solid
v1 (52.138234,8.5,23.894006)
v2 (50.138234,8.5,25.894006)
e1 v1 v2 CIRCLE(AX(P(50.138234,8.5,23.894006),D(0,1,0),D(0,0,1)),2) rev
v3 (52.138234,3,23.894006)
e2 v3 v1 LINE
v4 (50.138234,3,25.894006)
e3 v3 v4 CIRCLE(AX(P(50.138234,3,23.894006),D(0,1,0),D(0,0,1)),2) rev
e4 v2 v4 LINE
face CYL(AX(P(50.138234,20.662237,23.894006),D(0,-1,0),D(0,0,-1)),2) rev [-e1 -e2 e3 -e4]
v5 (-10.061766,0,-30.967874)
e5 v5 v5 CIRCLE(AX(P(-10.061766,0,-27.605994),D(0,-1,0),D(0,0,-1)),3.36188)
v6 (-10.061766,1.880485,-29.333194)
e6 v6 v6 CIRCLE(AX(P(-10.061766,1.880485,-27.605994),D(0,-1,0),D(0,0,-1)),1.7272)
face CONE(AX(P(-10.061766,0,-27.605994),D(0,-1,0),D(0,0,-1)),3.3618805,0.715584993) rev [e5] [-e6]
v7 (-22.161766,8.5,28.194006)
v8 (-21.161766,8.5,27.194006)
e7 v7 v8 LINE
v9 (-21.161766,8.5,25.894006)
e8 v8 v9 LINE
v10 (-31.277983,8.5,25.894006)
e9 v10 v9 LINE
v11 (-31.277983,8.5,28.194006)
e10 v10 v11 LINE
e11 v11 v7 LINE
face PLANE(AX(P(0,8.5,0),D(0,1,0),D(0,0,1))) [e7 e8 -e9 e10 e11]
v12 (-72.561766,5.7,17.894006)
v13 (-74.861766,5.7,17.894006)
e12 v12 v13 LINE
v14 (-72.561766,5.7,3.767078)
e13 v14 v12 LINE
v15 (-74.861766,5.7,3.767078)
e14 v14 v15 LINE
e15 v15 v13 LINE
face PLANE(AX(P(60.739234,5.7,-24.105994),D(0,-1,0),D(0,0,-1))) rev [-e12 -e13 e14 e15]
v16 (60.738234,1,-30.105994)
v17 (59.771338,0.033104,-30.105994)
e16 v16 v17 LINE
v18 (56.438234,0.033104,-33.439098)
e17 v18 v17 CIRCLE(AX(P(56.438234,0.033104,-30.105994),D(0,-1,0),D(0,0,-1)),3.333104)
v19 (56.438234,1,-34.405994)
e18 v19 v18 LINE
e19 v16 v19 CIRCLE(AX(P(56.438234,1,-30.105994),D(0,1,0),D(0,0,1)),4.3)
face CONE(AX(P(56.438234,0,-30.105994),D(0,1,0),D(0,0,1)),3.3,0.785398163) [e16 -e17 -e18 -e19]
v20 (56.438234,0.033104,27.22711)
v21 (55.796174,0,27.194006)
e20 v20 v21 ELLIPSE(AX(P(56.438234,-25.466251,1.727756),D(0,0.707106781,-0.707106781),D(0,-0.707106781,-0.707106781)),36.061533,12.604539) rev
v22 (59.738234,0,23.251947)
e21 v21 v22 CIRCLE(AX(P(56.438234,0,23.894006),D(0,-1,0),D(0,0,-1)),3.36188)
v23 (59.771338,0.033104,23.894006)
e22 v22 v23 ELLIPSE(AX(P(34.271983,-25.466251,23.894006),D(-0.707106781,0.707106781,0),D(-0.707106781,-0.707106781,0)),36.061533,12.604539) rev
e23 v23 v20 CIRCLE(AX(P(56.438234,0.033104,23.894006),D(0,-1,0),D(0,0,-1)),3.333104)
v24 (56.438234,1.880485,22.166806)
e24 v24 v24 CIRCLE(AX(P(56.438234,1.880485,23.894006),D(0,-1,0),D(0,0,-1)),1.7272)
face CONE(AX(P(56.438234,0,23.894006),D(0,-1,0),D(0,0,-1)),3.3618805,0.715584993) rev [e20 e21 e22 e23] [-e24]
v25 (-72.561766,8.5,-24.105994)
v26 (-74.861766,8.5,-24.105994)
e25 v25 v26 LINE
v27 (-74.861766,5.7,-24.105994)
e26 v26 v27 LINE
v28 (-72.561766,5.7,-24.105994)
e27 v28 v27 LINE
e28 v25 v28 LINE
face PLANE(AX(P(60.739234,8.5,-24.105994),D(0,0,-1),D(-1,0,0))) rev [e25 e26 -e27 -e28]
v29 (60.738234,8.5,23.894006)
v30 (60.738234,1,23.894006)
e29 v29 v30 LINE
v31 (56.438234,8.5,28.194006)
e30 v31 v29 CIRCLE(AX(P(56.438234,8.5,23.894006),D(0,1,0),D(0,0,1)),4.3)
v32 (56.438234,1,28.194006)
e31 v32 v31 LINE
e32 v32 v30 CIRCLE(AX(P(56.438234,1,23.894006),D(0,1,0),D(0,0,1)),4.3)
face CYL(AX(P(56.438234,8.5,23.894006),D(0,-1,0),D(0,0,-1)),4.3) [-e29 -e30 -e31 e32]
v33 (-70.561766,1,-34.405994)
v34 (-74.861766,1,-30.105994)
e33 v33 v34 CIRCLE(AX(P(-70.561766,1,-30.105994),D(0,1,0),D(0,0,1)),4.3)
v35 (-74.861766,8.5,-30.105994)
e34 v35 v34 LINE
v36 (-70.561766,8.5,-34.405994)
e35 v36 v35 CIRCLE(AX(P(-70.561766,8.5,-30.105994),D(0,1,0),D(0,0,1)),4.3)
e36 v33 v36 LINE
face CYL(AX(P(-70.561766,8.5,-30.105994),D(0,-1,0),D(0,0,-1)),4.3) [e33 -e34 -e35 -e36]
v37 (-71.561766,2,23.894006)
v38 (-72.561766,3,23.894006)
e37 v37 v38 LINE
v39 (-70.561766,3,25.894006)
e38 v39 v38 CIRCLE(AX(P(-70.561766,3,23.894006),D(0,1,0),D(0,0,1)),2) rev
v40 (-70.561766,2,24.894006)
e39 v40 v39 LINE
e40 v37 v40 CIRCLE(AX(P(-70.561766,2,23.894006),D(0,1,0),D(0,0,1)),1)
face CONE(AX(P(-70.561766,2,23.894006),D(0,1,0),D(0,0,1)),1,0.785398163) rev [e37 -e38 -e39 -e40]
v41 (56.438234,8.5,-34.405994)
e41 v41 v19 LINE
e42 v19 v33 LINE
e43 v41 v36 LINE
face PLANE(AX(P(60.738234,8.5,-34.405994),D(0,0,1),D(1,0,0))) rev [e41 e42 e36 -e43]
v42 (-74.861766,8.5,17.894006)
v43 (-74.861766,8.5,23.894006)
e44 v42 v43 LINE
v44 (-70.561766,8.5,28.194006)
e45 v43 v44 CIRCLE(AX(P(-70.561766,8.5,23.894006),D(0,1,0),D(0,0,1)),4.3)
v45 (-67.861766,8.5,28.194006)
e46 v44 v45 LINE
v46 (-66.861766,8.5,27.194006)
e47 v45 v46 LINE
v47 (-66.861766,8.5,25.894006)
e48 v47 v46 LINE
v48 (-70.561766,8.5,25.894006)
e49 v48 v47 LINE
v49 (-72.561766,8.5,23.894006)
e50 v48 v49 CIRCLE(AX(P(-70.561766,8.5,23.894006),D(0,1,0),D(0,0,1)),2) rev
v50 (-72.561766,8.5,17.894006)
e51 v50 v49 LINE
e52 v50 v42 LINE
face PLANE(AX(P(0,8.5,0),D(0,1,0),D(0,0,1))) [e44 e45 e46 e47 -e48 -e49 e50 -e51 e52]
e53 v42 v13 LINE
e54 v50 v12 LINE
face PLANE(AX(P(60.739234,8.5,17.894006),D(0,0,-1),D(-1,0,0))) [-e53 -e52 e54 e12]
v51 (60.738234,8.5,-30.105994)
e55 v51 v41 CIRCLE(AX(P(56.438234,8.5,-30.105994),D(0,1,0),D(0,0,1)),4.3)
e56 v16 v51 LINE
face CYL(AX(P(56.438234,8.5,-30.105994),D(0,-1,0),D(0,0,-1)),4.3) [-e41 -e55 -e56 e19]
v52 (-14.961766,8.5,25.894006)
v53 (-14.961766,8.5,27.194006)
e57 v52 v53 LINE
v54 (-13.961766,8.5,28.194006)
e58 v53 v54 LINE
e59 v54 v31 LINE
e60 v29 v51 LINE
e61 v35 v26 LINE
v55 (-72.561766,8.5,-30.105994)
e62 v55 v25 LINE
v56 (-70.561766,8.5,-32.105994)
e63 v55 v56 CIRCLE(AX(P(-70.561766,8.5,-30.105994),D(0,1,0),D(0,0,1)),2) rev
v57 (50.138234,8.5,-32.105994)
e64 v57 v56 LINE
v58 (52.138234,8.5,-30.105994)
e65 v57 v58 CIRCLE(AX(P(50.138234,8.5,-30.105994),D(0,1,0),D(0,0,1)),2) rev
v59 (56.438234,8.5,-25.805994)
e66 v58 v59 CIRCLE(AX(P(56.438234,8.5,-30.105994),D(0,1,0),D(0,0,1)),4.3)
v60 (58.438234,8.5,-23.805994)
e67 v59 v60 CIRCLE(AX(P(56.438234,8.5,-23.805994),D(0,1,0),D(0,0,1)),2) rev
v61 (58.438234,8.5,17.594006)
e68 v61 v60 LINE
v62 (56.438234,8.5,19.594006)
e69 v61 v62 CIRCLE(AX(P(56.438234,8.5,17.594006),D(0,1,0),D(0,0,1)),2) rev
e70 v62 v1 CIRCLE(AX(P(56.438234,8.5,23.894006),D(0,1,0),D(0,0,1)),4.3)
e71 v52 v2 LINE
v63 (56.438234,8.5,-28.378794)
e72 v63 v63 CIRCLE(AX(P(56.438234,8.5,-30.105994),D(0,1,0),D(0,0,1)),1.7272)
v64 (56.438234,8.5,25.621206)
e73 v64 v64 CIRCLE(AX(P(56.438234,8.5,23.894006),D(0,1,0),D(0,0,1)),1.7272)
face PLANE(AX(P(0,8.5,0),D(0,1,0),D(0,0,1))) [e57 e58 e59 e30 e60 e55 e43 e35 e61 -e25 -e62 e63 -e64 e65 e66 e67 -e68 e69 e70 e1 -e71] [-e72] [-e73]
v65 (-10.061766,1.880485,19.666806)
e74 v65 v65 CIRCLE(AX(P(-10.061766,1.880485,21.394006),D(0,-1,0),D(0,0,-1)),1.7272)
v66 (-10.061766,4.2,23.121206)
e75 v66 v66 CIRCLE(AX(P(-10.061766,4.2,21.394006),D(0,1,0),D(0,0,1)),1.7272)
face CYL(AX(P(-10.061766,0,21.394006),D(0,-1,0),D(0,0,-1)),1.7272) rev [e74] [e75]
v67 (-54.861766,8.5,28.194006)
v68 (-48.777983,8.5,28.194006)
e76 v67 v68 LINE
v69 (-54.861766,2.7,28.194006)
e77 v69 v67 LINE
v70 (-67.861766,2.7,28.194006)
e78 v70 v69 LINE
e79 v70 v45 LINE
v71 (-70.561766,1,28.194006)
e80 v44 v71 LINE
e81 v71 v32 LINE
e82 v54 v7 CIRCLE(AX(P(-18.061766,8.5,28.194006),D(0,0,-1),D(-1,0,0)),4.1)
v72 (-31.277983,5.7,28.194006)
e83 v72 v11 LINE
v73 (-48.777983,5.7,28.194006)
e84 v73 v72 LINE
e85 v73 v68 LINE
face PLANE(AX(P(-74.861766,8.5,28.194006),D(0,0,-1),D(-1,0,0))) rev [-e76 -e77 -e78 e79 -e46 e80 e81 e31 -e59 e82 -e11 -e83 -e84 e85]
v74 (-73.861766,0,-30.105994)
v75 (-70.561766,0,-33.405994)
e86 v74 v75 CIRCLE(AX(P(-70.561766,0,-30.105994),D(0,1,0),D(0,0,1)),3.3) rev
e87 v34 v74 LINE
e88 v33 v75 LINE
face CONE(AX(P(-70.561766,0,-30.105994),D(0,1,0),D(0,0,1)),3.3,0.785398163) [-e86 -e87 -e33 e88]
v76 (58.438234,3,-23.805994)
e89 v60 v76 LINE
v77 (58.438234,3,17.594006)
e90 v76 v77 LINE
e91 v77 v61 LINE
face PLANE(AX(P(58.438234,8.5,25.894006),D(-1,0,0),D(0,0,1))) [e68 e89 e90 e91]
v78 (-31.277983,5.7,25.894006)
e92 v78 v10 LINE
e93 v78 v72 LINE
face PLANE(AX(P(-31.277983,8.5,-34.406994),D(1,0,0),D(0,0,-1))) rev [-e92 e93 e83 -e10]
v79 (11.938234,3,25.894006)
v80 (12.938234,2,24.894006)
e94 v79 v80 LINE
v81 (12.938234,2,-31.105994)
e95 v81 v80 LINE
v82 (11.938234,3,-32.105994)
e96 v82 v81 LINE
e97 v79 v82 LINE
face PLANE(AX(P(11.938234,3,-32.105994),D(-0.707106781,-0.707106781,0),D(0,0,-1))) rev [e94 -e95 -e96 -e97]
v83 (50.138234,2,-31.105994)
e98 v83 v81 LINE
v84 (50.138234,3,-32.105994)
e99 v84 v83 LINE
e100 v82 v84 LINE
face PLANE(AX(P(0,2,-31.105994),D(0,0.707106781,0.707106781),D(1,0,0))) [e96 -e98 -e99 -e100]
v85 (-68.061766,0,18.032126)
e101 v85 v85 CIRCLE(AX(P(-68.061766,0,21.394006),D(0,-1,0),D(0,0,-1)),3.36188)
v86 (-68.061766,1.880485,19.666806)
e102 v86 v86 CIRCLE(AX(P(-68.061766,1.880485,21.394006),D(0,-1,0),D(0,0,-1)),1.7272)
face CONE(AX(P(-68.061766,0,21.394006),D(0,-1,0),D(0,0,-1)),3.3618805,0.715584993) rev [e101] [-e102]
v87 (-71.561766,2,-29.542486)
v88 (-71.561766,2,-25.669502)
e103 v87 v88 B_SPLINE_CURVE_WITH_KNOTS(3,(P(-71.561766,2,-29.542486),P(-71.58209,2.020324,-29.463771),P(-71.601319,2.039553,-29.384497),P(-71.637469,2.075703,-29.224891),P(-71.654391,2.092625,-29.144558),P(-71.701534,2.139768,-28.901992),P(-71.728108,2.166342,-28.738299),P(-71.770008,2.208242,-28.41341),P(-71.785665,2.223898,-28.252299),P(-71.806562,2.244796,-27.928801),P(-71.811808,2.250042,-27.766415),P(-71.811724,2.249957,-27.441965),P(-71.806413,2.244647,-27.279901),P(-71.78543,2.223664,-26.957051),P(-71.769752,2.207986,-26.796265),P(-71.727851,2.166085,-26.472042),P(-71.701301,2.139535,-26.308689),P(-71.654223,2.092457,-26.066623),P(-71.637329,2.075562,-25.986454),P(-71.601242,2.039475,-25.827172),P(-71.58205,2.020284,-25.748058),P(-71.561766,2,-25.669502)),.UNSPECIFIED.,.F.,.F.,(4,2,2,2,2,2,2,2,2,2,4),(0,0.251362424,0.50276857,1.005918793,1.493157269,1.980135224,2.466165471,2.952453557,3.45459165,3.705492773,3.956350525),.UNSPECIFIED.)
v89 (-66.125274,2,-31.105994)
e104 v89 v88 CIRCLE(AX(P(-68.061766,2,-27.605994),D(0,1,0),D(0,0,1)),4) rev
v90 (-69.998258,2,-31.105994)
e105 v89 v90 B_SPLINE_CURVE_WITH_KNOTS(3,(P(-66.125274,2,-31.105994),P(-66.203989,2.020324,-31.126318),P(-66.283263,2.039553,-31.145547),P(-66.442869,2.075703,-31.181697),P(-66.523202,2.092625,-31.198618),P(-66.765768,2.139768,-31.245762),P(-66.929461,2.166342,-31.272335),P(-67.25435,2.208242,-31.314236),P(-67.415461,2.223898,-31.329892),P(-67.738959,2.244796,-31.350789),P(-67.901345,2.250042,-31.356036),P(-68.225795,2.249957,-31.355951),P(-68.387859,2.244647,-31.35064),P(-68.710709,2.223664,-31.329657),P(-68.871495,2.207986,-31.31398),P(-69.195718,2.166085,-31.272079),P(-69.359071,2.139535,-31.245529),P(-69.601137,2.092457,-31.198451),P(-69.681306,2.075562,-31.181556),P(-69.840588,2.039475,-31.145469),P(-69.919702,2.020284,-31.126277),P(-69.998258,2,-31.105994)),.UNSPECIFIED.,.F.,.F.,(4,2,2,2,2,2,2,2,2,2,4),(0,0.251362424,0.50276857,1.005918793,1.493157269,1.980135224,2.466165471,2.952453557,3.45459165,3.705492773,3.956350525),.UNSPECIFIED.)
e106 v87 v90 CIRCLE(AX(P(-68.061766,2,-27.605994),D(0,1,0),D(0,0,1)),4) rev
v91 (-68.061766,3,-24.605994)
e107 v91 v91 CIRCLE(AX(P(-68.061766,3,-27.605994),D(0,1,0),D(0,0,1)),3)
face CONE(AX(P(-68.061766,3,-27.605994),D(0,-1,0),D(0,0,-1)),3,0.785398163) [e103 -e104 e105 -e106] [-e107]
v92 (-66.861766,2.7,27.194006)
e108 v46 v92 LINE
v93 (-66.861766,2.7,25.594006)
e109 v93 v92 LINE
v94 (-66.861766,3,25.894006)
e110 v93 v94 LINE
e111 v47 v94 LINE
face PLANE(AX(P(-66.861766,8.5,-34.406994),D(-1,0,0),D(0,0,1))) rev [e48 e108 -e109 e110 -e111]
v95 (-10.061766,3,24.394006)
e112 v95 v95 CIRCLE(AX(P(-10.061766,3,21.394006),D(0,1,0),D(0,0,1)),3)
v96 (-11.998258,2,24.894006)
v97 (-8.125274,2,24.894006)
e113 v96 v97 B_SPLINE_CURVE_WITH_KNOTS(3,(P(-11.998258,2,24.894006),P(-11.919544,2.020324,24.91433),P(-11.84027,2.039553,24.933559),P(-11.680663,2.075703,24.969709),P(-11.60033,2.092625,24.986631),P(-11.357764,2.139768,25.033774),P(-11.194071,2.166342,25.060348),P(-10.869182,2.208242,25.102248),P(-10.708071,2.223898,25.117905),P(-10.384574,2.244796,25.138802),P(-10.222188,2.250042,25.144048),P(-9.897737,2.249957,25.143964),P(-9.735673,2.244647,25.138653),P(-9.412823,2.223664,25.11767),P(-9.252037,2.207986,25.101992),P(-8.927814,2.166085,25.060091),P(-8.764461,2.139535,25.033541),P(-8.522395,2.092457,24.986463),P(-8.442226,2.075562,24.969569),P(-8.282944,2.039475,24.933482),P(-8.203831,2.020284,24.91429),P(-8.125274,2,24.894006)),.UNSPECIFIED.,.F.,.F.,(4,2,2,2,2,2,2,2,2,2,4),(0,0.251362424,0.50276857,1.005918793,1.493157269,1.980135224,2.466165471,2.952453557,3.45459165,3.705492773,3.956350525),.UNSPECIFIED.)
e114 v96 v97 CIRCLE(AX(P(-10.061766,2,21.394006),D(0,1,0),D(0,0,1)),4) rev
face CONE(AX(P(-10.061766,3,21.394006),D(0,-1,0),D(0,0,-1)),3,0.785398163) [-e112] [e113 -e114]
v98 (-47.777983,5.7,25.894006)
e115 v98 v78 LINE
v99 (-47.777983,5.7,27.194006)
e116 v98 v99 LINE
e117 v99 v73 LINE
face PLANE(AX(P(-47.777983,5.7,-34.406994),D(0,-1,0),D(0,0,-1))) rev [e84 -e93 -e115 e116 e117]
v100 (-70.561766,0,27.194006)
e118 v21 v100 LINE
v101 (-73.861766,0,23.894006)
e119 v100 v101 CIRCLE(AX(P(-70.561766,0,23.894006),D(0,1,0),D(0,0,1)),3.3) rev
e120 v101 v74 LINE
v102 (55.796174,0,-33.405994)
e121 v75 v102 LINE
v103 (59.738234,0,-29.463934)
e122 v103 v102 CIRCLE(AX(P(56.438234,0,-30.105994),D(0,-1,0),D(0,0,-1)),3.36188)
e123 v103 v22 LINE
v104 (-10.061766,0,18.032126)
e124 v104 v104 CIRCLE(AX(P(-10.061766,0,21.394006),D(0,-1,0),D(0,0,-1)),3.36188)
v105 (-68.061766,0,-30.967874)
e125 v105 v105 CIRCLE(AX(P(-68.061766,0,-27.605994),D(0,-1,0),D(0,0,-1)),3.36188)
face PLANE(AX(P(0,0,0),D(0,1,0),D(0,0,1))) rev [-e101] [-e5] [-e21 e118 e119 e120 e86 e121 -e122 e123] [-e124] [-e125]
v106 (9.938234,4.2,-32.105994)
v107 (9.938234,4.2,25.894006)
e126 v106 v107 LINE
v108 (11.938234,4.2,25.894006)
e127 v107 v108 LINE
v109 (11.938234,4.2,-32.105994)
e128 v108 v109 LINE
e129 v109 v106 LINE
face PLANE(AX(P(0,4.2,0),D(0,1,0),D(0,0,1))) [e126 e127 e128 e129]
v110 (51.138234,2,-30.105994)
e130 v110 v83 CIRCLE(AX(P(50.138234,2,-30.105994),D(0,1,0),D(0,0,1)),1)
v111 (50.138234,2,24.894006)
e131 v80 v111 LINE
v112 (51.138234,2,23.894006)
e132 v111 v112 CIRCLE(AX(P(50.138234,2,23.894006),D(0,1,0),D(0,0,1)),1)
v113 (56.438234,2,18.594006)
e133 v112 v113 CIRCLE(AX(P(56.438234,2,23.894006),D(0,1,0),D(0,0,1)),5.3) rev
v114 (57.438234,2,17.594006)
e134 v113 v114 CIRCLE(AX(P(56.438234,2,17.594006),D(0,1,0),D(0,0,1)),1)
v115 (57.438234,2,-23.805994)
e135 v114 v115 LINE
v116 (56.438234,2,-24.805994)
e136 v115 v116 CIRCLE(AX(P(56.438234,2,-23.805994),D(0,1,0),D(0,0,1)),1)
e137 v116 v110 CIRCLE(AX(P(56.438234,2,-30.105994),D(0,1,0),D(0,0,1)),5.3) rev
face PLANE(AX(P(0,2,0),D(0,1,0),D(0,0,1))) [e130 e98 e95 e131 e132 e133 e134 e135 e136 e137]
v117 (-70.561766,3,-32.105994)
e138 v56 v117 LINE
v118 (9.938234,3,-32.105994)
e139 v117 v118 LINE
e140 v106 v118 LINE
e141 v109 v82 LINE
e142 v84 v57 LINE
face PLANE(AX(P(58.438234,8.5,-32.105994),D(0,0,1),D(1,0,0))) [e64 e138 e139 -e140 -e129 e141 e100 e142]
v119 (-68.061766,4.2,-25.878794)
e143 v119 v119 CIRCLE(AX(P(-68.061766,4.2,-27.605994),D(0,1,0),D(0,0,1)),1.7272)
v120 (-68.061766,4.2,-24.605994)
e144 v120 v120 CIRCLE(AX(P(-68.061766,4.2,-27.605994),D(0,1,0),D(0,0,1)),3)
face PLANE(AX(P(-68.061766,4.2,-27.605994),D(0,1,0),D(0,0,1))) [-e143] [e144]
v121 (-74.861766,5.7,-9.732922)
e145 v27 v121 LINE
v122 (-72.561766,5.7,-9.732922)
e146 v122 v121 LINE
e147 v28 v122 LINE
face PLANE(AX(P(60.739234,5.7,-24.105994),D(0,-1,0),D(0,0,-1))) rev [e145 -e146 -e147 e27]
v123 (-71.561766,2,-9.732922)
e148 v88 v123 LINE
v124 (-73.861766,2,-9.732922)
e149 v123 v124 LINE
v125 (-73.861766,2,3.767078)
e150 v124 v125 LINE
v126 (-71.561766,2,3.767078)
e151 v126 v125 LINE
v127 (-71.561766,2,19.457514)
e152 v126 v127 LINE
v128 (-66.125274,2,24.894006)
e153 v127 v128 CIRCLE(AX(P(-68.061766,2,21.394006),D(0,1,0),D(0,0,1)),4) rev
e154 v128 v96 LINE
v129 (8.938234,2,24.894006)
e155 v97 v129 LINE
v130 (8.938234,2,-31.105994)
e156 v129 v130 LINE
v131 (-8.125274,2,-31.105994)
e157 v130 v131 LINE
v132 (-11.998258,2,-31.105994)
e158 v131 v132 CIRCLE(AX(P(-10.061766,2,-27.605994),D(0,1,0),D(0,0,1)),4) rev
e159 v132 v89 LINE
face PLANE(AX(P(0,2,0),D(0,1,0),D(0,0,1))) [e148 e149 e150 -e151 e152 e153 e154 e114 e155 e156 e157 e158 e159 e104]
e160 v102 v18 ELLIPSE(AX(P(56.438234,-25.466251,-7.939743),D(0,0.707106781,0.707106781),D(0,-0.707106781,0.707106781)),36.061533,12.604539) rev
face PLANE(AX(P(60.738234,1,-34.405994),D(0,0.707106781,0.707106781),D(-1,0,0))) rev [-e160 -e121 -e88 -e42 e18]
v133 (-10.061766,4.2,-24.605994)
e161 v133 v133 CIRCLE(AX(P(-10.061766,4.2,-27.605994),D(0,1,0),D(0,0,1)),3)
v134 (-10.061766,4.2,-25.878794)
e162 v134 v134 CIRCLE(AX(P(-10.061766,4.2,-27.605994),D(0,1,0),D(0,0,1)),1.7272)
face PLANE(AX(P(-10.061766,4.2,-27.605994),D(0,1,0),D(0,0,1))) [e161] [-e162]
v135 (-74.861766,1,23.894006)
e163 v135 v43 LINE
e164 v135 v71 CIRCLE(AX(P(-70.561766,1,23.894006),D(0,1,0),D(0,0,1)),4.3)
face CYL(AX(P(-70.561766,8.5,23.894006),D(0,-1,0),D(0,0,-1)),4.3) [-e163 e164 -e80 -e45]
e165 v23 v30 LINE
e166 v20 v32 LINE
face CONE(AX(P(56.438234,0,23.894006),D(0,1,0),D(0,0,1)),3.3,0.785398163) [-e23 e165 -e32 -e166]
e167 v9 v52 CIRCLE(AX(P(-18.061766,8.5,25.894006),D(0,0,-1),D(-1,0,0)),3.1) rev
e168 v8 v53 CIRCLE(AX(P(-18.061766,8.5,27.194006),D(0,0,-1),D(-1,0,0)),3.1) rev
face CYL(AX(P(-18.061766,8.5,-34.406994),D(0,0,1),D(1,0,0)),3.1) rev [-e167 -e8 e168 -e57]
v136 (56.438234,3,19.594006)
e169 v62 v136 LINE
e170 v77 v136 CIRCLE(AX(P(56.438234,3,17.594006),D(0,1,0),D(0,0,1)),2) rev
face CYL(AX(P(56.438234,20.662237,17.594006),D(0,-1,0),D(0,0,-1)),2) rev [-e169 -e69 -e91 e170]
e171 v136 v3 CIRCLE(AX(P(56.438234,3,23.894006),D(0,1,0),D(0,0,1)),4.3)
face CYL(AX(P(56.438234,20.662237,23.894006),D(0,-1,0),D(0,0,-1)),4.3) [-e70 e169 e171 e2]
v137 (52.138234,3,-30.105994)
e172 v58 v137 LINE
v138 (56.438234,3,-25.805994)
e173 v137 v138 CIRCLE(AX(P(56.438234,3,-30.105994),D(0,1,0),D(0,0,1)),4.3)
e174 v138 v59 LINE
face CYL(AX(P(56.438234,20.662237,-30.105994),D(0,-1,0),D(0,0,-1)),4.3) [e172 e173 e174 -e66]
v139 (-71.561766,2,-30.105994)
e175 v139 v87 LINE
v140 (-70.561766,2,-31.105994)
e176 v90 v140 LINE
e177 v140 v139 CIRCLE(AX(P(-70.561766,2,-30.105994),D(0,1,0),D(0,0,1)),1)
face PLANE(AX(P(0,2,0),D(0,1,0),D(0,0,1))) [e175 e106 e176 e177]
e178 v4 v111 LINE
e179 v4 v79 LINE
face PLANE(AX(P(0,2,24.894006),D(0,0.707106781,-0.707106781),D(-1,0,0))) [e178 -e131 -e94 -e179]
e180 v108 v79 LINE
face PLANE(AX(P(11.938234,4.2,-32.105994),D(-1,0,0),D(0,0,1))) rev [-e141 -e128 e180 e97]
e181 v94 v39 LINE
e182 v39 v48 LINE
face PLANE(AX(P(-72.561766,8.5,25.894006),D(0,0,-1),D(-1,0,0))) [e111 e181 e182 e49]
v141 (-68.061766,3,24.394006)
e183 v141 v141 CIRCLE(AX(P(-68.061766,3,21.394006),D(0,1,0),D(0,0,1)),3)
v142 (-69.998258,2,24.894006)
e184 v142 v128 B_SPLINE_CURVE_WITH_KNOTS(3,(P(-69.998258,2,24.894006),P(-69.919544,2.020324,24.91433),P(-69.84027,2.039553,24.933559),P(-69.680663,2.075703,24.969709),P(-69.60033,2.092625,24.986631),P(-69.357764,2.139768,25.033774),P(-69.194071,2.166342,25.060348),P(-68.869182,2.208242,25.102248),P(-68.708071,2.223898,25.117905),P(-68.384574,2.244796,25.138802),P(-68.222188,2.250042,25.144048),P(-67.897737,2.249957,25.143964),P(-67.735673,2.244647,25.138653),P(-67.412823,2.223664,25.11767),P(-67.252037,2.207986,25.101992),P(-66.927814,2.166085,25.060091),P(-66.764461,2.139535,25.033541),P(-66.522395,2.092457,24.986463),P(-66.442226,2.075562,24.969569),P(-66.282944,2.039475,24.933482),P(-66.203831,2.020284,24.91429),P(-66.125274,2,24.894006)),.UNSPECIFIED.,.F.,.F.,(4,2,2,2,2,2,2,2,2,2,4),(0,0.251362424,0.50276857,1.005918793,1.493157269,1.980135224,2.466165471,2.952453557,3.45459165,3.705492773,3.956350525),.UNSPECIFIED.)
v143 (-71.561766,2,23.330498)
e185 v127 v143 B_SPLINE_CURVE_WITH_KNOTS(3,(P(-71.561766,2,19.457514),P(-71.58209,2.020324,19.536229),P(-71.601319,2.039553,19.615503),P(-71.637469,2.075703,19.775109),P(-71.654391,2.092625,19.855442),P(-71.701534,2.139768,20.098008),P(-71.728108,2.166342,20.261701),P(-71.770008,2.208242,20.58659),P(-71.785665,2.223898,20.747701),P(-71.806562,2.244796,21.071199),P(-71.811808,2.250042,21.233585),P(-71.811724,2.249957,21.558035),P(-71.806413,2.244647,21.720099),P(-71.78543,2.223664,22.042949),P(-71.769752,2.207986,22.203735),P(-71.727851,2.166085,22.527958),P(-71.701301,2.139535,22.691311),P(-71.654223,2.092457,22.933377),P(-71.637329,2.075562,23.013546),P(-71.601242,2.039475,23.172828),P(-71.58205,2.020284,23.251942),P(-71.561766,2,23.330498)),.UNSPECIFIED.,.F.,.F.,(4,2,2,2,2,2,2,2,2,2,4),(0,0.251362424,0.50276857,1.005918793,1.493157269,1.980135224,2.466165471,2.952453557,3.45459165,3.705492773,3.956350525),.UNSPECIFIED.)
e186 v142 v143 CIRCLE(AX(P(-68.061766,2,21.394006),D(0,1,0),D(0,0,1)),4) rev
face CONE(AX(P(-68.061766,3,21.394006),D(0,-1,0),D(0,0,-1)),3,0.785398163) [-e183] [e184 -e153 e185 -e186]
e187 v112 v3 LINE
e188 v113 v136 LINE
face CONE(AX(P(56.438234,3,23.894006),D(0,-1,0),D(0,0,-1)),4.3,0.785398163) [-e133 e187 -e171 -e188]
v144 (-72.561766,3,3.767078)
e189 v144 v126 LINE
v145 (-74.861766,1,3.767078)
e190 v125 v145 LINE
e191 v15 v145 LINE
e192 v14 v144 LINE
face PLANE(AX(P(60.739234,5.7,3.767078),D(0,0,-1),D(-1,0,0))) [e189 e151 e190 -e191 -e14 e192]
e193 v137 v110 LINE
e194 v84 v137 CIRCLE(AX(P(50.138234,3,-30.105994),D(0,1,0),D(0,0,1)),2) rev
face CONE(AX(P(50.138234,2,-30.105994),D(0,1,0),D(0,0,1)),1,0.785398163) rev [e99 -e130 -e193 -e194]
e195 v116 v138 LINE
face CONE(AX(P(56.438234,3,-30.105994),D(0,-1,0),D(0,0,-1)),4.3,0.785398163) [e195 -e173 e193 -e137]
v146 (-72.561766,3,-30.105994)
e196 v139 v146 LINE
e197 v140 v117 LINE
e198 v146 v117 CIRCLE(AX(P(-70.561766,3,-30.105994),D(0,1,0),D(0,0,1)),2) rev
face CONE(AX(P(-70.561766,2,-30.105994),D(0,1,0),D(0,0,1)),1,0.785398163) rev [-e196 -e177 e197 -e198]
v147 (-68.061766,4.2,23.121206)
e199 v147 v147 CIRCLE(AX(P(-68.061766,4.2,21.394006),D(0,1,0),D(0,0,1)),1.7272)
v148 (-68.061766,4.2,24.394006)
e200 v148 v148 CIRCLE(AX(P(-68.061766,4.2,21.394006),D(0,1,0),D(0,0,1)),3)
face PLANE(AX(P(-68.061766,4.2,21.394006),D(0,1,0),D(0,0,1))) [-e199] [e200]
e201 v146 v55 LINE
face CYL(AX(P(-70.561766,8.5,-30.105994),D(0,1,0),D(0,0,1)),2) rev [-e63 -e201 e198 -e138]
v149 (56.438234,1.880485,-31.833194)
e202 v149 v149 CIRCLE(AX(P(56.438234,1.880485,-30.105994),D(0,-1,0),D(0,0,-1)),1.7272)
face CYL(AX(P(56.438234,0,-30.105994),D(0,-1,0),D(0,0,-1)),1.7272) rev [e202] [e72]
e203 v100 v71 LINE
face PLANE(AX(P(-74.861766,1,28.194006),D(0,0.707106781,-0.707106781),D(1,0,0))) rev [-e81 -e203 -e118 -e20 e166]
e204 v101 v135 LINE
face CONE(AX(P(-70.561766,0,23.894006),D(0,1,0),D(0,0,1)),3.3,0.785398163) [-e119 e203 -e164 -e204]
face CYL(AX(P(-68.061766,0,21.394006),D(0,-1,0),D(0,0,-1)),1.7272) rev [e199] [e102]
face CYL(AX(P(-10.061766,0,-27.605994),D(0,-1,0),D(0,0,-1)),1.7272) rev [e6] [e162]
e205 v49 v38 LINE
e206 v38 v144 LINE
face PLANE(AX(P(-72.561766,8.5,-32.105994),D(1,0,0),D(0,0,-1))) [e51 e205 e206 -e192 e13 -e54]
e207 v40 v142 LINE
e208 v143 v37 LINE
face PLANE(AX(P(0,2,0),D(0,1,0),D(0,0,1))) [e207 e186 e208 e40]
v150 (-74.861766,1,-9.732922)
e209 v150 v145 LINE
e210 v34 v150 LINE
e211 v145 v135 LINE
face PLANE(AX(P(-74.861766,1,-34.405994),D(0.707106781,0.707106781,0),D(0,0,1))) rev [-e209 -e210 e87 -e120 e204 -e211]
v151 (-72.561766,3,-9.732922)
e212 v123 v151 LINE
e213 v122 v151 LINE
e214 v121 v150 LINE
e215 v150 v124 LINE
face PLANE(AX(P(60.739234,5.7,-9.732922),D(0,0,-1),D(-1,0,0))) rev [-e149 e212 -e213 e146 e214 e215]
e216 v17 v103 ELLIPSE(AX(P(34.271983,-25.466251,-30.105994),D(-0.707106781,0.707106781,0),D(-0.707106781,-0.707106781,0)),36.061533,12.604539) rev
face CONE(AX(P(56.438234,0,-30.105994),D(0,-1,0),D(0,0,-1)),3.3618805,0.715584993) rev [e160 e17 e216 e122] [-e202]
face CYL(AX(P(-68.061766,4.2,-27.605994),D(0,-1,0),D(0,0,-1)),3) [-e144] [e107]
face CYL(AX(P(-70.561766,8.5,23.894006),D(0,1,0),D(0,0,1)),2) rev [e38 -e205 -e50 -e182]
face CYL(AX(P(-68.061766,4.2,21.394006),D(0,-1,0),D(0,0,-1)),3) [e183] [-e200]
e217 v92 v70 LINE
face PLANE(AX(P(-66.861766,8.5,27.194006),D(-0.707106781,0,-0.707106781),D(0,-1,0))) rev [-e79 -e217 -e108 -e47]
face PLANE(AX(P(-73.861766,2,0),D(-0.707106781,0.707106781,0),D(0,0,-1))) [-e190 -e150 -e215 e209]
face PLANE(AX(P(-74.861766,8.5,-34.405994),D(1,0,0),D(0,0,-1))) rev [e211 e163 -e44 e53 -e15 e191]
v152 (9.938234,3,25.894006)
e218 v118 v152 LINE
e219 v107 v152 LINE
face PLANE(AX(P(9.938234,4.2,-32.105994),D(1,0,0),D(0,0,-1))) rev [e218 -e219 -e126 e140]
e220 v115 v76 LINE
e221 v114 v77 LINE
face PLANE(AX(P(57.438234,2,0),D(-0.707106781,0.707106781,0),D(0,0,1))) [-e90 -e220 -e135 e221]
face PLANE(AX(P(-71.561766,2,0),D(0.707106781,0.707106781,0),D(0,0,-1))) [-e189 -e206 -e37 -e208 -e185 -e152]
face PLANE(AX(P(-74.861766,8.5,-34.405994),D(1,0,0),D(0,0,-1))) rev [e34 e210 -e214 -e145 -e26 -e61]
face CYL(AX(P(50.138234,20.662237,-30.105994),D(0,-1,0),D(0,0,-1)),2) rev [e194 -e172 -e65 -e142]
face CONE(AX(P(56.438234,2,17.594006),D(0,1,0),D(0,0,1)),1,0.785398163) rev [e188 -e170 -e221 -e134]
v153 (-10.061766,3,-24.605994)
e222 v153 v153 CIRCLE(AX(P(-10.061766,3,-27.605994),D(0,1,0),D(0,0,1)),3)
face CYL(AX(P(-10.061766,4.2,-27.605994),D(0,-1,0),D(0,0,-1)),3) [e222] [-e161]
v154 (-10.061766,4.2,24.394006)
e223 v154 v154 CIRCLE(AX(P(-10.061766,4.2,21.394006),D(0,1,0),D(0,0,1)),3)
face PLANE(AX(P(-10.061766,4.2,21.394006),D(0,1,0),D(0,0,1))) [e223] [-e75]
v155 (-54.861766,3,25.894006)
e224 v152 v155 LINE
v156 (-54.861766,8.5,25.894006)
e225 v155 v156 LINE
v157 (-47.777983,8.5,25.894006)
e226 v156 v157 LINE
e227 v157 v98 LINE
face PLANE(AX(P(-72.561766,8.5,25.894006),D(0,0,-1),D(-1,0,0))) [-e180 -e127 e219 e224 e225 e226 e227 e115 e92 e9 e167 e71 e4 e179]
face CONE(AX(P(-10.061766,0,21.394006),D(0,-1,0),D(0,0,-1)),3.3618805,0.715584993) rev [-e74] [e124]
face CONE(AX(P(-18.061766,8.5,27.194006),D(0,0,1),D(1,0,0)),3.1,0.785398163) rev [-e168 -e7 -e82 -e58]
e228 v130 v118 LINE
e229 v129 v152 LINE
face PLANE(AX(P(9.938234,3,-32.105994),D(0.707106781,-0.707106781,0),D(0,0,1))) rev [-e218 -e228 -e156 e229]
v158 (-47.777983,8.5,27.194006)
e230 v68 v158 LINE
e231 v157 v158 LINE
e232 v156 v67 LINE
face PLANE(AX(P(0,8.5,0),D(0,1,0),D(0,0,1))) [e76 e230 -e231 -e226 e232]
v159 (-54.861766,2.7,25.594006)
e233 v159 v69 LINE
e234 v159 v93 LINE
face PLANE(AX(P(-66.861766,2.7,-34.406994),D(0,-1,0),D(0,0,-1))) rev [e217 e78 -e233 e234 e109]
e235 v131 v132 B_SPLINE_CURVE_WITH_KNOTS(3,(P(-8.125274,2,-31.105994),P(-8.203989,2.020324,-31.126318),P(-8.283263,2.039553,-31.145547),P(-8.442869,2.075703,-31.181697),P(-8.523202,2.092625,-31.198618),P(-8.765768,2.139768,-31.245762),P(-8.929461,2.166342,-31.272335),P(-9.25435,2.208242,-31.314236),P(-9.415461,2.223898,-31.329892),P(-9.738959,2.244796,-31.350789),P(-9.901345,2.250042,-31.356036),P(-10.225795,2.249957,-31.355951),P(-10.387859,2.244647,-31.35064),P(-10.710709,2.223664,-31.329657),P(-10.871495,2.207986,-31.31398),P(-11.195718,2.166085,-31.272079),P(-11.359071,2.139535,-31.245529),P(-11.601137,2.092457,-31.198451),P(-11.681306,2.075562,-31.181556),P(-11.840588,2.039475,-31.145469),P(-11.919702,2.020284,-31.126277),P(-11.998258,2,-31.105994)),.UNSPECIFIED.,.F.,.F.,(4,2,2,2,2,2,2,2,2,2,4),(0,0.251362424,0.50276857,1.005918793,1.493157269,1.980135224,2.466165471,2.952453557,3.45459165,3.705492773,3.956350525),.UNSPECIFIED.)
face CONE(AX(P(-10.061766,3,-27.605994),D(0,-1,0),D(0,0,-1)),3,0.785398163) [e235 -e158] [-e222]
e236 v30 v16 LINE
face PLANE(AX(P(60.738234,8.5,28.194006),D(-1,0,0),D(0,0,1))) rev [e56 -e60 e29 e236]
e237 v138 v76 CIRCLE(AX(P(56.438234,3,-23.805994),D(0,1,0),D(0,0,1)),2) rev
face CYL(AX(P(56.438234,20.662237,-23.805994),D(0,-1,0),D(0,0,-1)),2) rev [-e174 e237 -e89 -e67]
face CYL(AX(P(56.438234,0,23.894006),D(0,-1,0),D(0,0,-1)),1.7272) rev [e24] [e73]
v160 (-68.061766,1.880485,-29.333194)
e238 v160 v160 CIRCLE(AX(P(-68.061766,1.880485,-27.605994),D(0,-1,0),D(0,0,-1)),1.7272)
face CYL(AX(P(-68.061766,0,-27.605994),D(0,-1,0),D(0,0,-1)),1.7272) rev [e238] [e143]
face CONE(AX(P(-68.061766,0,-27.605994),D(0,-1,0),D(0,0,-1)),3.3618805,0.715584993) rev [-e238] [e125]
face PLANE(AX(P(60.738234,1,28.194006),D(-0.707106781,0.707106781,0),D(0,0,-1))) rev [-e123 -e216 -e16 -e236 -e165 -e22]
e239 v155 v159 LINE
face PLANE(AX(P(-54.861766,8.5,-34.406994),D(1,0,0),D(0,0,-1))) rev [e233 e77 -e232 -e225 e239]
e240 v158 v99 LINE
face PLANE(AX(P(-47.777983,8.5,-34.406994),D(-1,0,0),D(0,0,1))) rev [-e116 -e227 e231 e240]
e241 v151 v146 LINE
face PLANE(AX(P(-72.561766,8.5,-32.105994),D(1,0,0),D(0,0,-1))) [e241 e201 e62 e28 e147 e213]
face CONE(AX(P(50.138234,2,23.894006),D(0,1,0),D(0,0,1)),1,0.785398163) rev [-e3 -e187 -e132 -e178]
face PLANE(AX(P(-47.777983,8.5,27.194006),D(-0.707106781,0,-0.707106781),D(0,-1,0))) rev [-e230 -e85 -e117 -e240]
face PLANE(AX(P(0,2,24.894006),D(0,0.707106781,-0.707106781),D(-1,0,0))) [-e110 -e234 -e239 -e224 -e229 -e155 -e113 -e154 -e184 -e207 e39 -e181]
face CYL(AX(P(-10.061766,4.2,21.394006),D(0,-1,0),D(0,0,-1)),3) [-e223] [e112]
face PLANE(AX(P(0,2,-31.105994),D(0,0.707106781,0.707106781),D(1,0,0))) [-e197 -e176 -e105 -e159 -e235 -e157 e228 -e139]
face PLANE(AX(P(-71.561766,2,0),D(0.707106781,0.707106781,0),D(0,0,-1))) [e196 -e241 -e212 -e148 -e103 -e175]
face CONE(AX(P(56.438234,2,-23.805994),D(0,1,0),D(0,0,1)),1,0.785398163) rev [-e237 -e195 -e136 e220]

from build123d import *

# Parameters (mm, degrees)
SKETCH3_W                                         = 135.6
SKETCH3_H                                         = 62.6
SKETCH3_W_2                                       = 131
SKETCH3_H_2                                       = 58
BOSS_EXTRUDE1_DEPTH                               = 8.5
SKETCH5_W                                         = 131
SKETCH5_H                                         = 58
BOSS_EXTRUDE2_DEPTH                               = 2
SKETCH6_R                                         = 3
BOSS_EXTRUDE3_DEPTH                               = 2.2
SKETCH10_W                                        = 2
SKETCH10_H                                        = 58
BOSS_EXTRUDE4_DEPTH                               = 2.2
CUT_EXTRUDE1_REACH                                = 99.956
SKETCH11_R                                        = 3.1
SKETCH11_W                                        = 12
SKETCH11_H                                        = 5.8
SKETCH11_W_2                                      = 16.5
SKETCH11_H_2                                      = 2.8
CUT_EXTRUDE2_REACH                                = 142.155
SKETCH12_W                                        = 42
SKETCH12_H                                        = 2.8
SKETCH12_W_2                                      = 13.5
SKETCH12_H_2                                      = 3.7
FILLET6_R                                         = 2
FILLET8_R                                         = 2
CHAMFER1_SIZE                                     = 1
SKETCH24_R                                        = 4.3
BOSS_EXTRUDE7_DEPTH                               = 6.5
FILLET21_R                                        = 2
FILLET22_R                                        = 2
FILLET20_R                                        = 4.3
CHAMFER5_SIZE                                     = 1
CSK_FOR_4_FLAT_HEAD_SOCKET_CAP_SCREW1_D           = 3.4544
CSK_FOR_4_FLAT_HEAD_SOCKET_CAP_SCREW1_DEPTH       = 14
CSK_FOR_4_FLAT_HEAD_SOCKET_CAP_SCREW1_CSINK_D     = 6.723761
CSK_FOR_4_FLAT_HEAD_SOCKET_CAP_SCREW1_CSINK_ANGLE = 82
CSK_FOR_4_FLAT_HEAD_SOCKET_CAP_SCREW1_TIP         = 1.037806461
CHAMFER6_SIZE                                     = 1
CHAMFER7_SIZE                                     = 1
CHAMFER8_SIZE                                     = 1


# Some blends are built 0.0001 mm under size
with BuildPart() as part:
    # Sketch3 → Boss-Extrude1 (new body)
    with BuildSketch(Plane(origin=(0, 0, 0), x_dir=(1, 0, 0), z_dir=(0, 1, 0))):
        with Locations((-7.061766162, 3.105993834)):
            Rectangle(SKETCH3_W, SKETCH3_H)
        with Locations((-7.061766162, 3.105993834)):
            Rectangle(SKETCH3_W_2, SKETCH3_H_2, mode=Mode.SUBTRACT)
    extrude(amount=BOSS_EXTRUDE1_DEPTH)

    # Sketch5 → Boss-Extrude2 (add)
    with BuildSketch(Plane(origin=(0, 0, 0), x_dir=(1, 0, 0), z_dir=(0, 1, 0))):
        with Locations((-7.061766162, 3.105993834)):
            Rectangle(SKETCH5_W, SKETCH5_H)
    extrude(amount=BOSS_EXTRUDE2_DEPTH)

    # Sketch6 → Boss-Extrude3 (add)
    with BuildSketch(Plane(origin=(0, 2, 0), x_dir=(1, 0, 0), z_dir=(0, 1, 0))):
        with Locations(Location((-68.061766162, 27.605993834, 0), (0, 0, 270))):
            Circle(SKETCH6_R)
        with Locations(Location((-68.061766162, -21.394006166, 0), (0, 0, 270))):
            Circle(SKETCH6_R)
        with Locations(Location((-10.061766162, -21.394006166, 0), (0, 0, 270))):
            Circle(SKETCH6_R)
        with Locations(Location((-10.061766162, 27.605993834, 0), (0, 0, 270))):
            Circle(SKETCH6_R)
    extrude(amount=BOSS_EXTRUDE3_DEPTH)

    # Sketch10 → Boss-Extrude4 (add)
    with BuildSketch(Plane(origin=(0, 2, 0), x_dir=(1, 0, 0), z_dir=(0, 1, 0))):
        with Locations((10.938233838, 3.105993834)):
            Rectangle(SKETCH10_W, SKETCH10_H)
    extrude(amount=BOSS_EXTRUDE4_DEPTH)

    # Sketch11 → Cut-Extrude1 (cut, up to next)
    with BuildSketch(Plane.XY.offset(28.194006166), mode=Mode.PRIVATE) as cut_extrude1_sk1:
        with Locations((-18.061766162, 8.5)):
            Circle(SKETCH11_R)
    cut_extrude1_tool1 = extrude(cut_extrude1_sk1.sketch, amount=-CUT_EXTRUDE1_REACH, mode=Mode.PRIVATE) & part.part
    # Sketch11 → Cut-Extrude1 (cut, up to next)
    with BuildSketch(Plane.XY.offset(28.194006166), mode=Mode.PRIVATE) as cut_extrude1_sk2:
        with Locations((-60.861766162, 5.6)):
            Rectangle(SKETCH11_W, SKETCH11_H)
    cut_extrude1_tool2 = extrude(cut_extrude1_sk2.sketch, amount=-CUT_EXTRUDE1_REACH, mode=Mode.PRIVATE) & part.part
    # Sketch11 → Cut-Extrude1 (cut, up to next)
    with BuildSketch(Plane.XY.offset(28.194006166), mode=Mode.PRIVATE) as cut_extrude1_sk3:
        with Locations((-39.527982648, 7.1)):
            Rectangle(SKETCH11_W_2, SKETCH11_H_2)
    cut_extrude1_tool3 = extrude(cut_extrude1_sk3.sketch, amount=-CUT_EXTRUDE1_REACH, mode=Mode.PRIVATE) & part.part
    add(cut_extrude1_tool1.solids().sort_by_distance((-18.061766, 8.5, 28.194006))[0], mode=Mode.SUBTRACT)
    add(cut_extrude1_tool2.solids().sort_by_distance((-60.861766, 5.6, 28.194006))[0], mode=Mode.SUBTRACT)
    add(cut_extrude1_tool3.solids().sort_by_distance((-39.527983, 7.1, 28.194006))[0], mode=Mode.SUBTRACT)

    # Sketch12 → Cut-Extrude2 (cut, up to next)
    with BuildSketch(Plane.ZY.offset(74.861766162), mode=Mode.PRIVATE) as cut_extrude2_sk1:
        with Locations((-3.105993834, 7.1)):
            Rectangle(SKETCH12_W, SKETCH12_H)
    cut_extrude2_tool1 = extrude(cut_extrude2_sk1.sketch, amount=-CUT_EXTRUDE2_REACH, mode=Mode.PRIVATE) & part.part
    # Sketch12 → Cut-Extrude2 (cut, up to next)
    with BuildSketch(Plane.ZY.offset(74.861766162), mode=Mode.PRIVATE) as cut_extrude2_sk2:
        with Locations((-2.982922372, 3.85)):
            Rectangle(SKETCH12_W_2, SKETCH12_H_2)
    cut_extrude2_tool2 = extrude(cut_extrude2_sk2.sketch, amount=-CUT_EXTRUDE2_REACH, mode=Mode.PRIVATE) & part.part
    add(cut_extrude2_tool1.solids().sort_by_distance((-74.861766, 7.1, -3.105994))[0], mode=Mode.SUBTRACT)
    add(cut_extrude2_tool2.solids().sort_by_distance((-74.861766, 3.85, -2.982922))[0], mode=Mode.SUBTRACT)

    # Fillet6
    fillet6_edges = [part.edges().sort_by_distance(p)[0] for p in [
        (58.438233838, 5.25, -32.105993834),
    ]]
    fillet(fillet6_edges, radius=FILLET6_R)

    # Fillet8
    fillet8_edges = [part.edges().sort_by_distance(p)[0] for p in [
        (-72.561766162, 5.25, -32.105993834),
        (-72.561766162, 5.25, 25.894006166),
    ]]
    fillet(fillet8_edges, radius=FILLET8_R)

    # Chamfer1
    chamfer1_edges = [part.edges().sort_by_distance(p)[0] for p in [
        (-68.061766162, 2, -30.605993834),
        (-68.061766162, 2, 18.394006166),
        (-10.061766162, 2, 18.394006166),
        (-10.061766162, 2, -30.605993834),
    ]]
    chamfer(chamfer1_edges, length=CHAMFER1_SIZE)

    # Sketch24 → Boss-Extrude7 (add)
    with BuildSketch(Plane(origin=(0, 2, 0), x_dir=(1, 0, 0), z_dir=(0, 1, 0))):
        with Locations((56.438233838, -23.894006166)):
            Circle(SKETCH24_R)
        with Locations((56.438233838, 30.105993834)):
            Circle(SKETCH24_R)
    extrude(amount=BOSS_EXTRUDE7_DEPTH)

    # Fillet21
    fillet21_edges = [part.edges().sort_by_distance(p)[0] for p in [
        (52.631660576, 5.25, 25.894006166),
    ]]
    fillet(fillet21_edges, radius=FILLET21_R)

    # Fillet22
    fillet22_edges = [part.edges().sort_by_distance(p)[0] for p in [
        (58.438233838, 5.25, 20.087432904),
        (58.438233838, 5.25, -26.299420572),
        (52.631660576, 5.25, -32.105993834),
    ]]
    fillet(fillet22_edges, radius=FILLET22_R)

    # Fillet20
    fillet20_edges = [part.edges().sort_by_distance(p)[0] for p in [
        (-74.861766162, 4.25, -34.405993834),
        (60.738233838, 4.25, -34.405993834),
        (60.738233838, 4.25, 28.194006166),
        (-74.861766162, 4.25, 28.194006166),
    ]]
    fillet(fillet20_edges, radius=FILLET20_R - 0.0001)  # a hair under: the kernel refuses the full size

    # Chamfer5
    # the kernel refuses this chamfer: 1 mm, written as the material it adds along each edge
    with BuildSketch(Plane(origin=(-72.561766162, 2, 23.894006166), x_dir=(0.9996219169112968, -0.027495876610586605, 0), z_dir=(0, 0, -1))) as chamfer5_piece_1:
        Polygon((CHAMFER5_SIZE * 0.999621916911, -CHAMFER5_SIZE * 0.0274958766106), (-CHAMFER5_SIZE * 0.0274958766106, -CHAMFER5_SIZE * 0.999621916911), (0, 0), align=None)
    extrude(amount=20.126928538)
    with BuildSketch(Plane(origin=(-72.561766162, 2, -9.732922372), x_dir=(-0.02749587661058217, 0.9996219169112968, 0), z_dir=(0, 0, -1))) as chamfer5_piece_2:
        Polygon((CHAMFER5_SIZE * 0.999621916911, CHAMFER5_SIZE * 0.0274958766106), (-CHAMFER5_SIZE * 0.0274958766106, CHAMFER5_SIZE * 0.999621916911), (0, 0), align=None)
    extrude(amount=20.373071462)
    with BuildSketch(Plane(origin=(-70.561766162, 2, 23.894006166), x_dir=(0, 0, 1), z_dir=(1, 0, 0))) as chamfer5_piece_3:
        Polygon((2 - CHAMFER5_SIZE, 0), (2, -CHAMFER5_SIZE), (2, 0), align=None)
    revolve(axis=Axis((-70.561766162, 2, 23.894006166), (0, -1, 0)), revolution_arc=90)
    with BuildSketch(Plane(origin=(-70.561766162, 2, -30.105993834), x_dir=(0, 0, -1), z_dir=(1, 0, 0))) as chamfer5_piece_4:
        Polygon((2, CHAMFER5_SIZE), (2 - CHAMFER5_SIZE, 0), (2, 0), align=None)
    revolve(axis=Axis((-70.561766162, 2, -30.105993834), (0, 1, 0)), revolution_arc=90)
    with BuildSketch(Plane(origin=(12.509916826, 2, 25.894006166), x_dir=(0, 0.9996219169112968, 0.027495876610585623), z_dir=(-1, 0, 0))) as chamfer5_piece_5_section:
        Polygon((CHAMFER5_SIZE * 0.999621916911, CHAMFER5_SIZE * 0.0274958766106), (-CHAMFER5_SIZE * 0.0274958766106, CHAMFER5_SIZE * 0.999621916911), (0, 0), align=None)
    chamfer5_piece_5 = extrude(amount=83.071682988, mode=Mode.PRIVATE)
    chamfer5_piece_5 = split(chamfer5_piece_5, bisect_by=Plane(origin=(-54.861766162, 2.8, 25.794006166), z_dir=(1, 0, 0)), keep=Keep.TOP, mode=Mode.PRIVATE)
    add(chamfer5_piece_5)
    with BuildSketch(Plane(origin=(12.509916826, 2, 25.894006166), x_dir=(0, 0.9996219169112968, 0.027495876610585623), z_dir=(-1, 0, 0))) as chamfer5_piece_6_section:
        Polygon((CHAMFER5_SIZE * 0.999621916911, CHAMFER5_SIZE * 0.0274958766106), (-CHAMFER5_SIZE * 0.0274958766106, CHAMFER5_SIZE * 0.999621916911), (0, 0), align=None)
    chamfer5_piece_6 = extrude(amount=83.071682988, mode=Mode.PRIVATE)
    chamfer5_piece_6 = split(chamfer5_piece_6, bisect_by=Plane(origin=(-60.854561902, 2.7, 25.53824485), z_dir=(0, -1, 0)), keep=Keep.TOP, mode=Mode.PRIVATE)
    add(chamfer5_piece_6)
    with BuildSketch(Plane(origin=(12.509916826, 2, 25.894006166), x_dir=(0, 0.9996219169112968, 0.027495876610585623), z_dir=(-1, 0, 0))) as chamfer5_piece_7_section:
        Polygon((CHAMFER5_SIZE * 0.999621916911, CHAMFER5_SIZE * 0.0274958766106), (-CHAMFER5_SIZE * 0.0274958766106, CHAMFER5_SIZE * 0.999621916911), (0, 0), align=None)
    chamfer5_piece_7 = extrude(amount=83.071682988, mode=Mode.PRIVATE)
    chamfer5_piece_7 = split(chamfer5_piece_7, bisect_by=Plane(origin=(-66.861766162, 2.802568974, 25.79914411), z_dir=(-1, 0, 0)), keep=Keep.TOP, mode=Mode.PRIVATE)
    add(chamfer5_piece_7)
    with BuildSketch(Plane(origin=(-70.561766162, 2, -32.105993834), x_dir=(0, 0.9996219169112968, -0.027495876610589075), z_dir=(1, 0, 0))) as chamfer5_piece_8:
        Polygon((CHAMFER5_SIZE * 0.999621916911, CHAMFER5_SIZE * 0.0274958766106), (-CHAMFER5_SIZE * 0.0274958766106, CHAMFER5_SIZE * 0.999621916911), (0, 0), align=None)
    extrude(amount=83.071682988)
    with BuildSketch(Plane(origin=(9.938233838, 2, 25.894006166), x_dir=(0.027495876610585623, 0.9996219169112968, 0), z_dir=(0, 0, -1))) as chamfer5_piece_9:
        Polygon((CHAMFER5_SIZE * 0.999621916911, -CHAMFER5_SIZE * 0.0274958766106), (-CHAMFER5_SIZE * 0.0274958766106, -CHAMFER5_SIZE * 0.999621916911), (0, 0), align=None)
    extrude(amount=58)
    with BuildSketch(Plane(origin=(11.938233838, 2, -32.105993834), x_dir=(0.9996219169112968, -0.027495876610586296, 0), z_dir=(0, 0, 1))) as chamfer5_piece_10:
        Polygon((CHAMFER5_SIZE * 0.999621916911, CHAMFER5_SIZE * 0.0274958766106), (-CHAMFER5_SIZE * 0.0274958766106, CHAMFER5_SIZE * 0.999621916911), (0, 0), align=None)
    extrude(amount=58)
    with BuildSketch(Plane(origin=(9.36655085, 2, -32.105993834), x_dir=(0, 0.9996219169112968, -0.027495876610589075), z_dir=(1, 0, 0)), Plane(origin=(50.138233838, 2, 25.894006166), x_dir=(0, 0.9996219169112968, 0.027495876610585623), z_dir=(-1, 0, 0))) as chamfer5_piece_11:
        Polygon((CHAMFER5_SIZE * 0.999621916911, CHAMFER5_SIZE * 0.0274958766106), (-CHAMFER5_SIZE * 0.0274958766106, CHAMFER5_SIZE * 0.999621916911), (0, 0), align=None)
    extrude(amount=40.771682988)
    with BuildSketch(Plane(origin=(56.438233838, 2, 23.894006166), x_dir=(0, 0, -1), z_dir=(1, 0, 0))) as chamfer5_piece_12:
        Polygon((4.3, CHAMFER5_SIZE), (4.3 + CHAMFER5_SIZE, 0), (4.3, 0), align=None)
    revolve(axis=Axis((56.438233838, 2, 23.894006166), (0, 1, 0)), revolution_arc=90)
    with BuildSketch(Plane(origin=(58.438233838, 2, -23.805993834), x_dir=(0.02749587661059598, 0.9996219169112965, 0), z_dir=(0, 0, 1))) as chamfer5_piece_13:
        Polygon((CHAMFER5_SIZE * 0.999621916911, CHAMFER5_SIZE * 0.0274958766106), (-CHAMFER5_SIZE * 0.0274958766106, CHAMFER5_SIZE * 0.999621916911), (0, 0), align=None)
    extrude(amount=41.4)
    with BuildSketch(Plane(origin=(56.438233838, 2, -30.105993834), x_dir=(-1, 0, 0), z_dir=(0, 0, -1))) as chamfer5_piece_14:
        Polygon((4.3, CHAMFER5_SIZE), (4.3 + CHAMFER5_SIZE, 0), (4.3, 0), align=None)
    revolve(axis=Axis((56.438233838, 2, -30.105993834), (0, 1, 0)), revolution_arc=90)
    with BuildSketch(Plane(origin=(50.138233838, 2, 23.894006166), x_dir=(0, 0, 1), z_dir=(-1, 0, 0))) as chamfer5_piece_15:
        Polygon((2, CHAMFER5_SIZE), (2 - CHAMFER5_SIZE, 0), (2, 0), align=None)
    revolve(axis=Axis((50.138233838, 2, 23.894006166), (0, 1, 0)), revolution_arc=90)
    with BuildSketch(Plane(origin=(56.438233838, 2, 17.594006166), x_dir=(0, 0, 1), z_dir=(-1, 0, 0))) as chamfer5_piece_16:
        Polygon((2, CHAMFER5_SIZE), (2 - CHAMFER5_SIZE, 0), (2, 0), align=None)
    revolve(axis=Axis((56.438233838, 2, 17.594006166), (0, 1, 0)), revolution_arc=90)
    with BuildSketch(Plane(origin=(56.438233838, 2, -23.805993834), x_dir=(1, 0, 0), z_dir=(0, 0, 1))) as chamfer5_piece_17:
        Polygon((2, CHAMFER5_SIZE), (2 - CHAMFER5_SIZE, 0), (2, 0), align=None)
    revolve(axis=Axis((56.438233838, 2, -23.805993834), (0, 1, 0)), revolution_arc=90)
    with BuildSketch(Plane(origin=(50.138233838, 2, -30.105993834), x_dir=(0, 0, -1), z_dir=(-1, 0, 0))) as chamfer5_piece_18:
        Polygon((2, -CHAMFER5_SIZE), (2 - CHAMFER5_SIZE, 0), (2, 0), align=None)
    revolve(axis=Axis((50.138233838, 2, -30.105993834), (0, -1, 0)), revolution_arc=90)

    # CSK for #4 Flat Head Socket Cap Screw1
    with Locations(Plane(origin=(0, 0, 0), x_dir=(-1, 0, 0), z_dir=(0, -1, 0))):
        with Locations((68.061766162, 27.605993834), (68.061766162, -21.394006166), (-56.438233838, 30.105993834), (-56.438233838, -23.894006166), (10.061766162, -21.394006166), (10.061766162, 27.605993834)):
            CounterSinkHole(CSK_FOR_4_FLAT_HEAD_SOCKET_CAP_SCREW1_D / 2, CSK_FOR_4_FLAT_HEAD_SOCKET_CAP_SCREW1_CSINK_D / 2, depth=CSK_FOR_4_FLAT_HEAD_SOCKET_CAP_SCREW1_DEPTH, counter_sink_angle=CSK_FOR_4_FLAT_HEAD_SOCKET_CAP_SCREW1_CSINK_ANGLE)
            with Locations((0, 0, -(CSK_FOR_4_FLAT_HEAD_SOCKET_CAP_SCREW1_DEPTH + CSK_FOR_4_FLAT_HEAD_SOCKET_CAP_SCREW1_TIP / 2))):  # 118° drill point
                Cone(0, CSK_FOR_4_FLAT_HEAD_SOCKET_CAP_SCREW1_D / 2, CSK_FOR_4_FLAT_HEAD_SOCKET_CAP_SCREW1_TIP, mode=Mode.SUBTRACT)

    # Chamfer6
    chamfer6_edges = [part.edges().sort_by_distance(p)[0] for p in [
        (-18.061766162, 5.4, 28.194006166),
        (-66.861766162, 5.6, 28.194006166),
        (-47.777982648, 7.1, 28.194006166),
    ]]
    chamfer(chamfer6_edges, length=CHAMFER6_SIZE)

    # Chamfer7
    # the kernel refuses this chamfer: 1 mm, written as the material it takes off along each edge
    with BuildSketch(Plane(origin=(56.438333838, 0, -34.405993834), x_dir=(0, -0.027495876610586292, 0.9996219169112968), z_dir=(-1, 0, 0)), Plane(origin=(-70.561866162, 0, 28.194006166), x_dir=(0, -0.02749587661058639, -0.9996219169112968), z_dir=(1, 0, 0))) as chamfer7_piece_1:
        Polygon((CHAMFER7_SIZE * 0.999621916911, CHAMFER7_SIZE * 0.0274958766106), (-CHAMFER7_SIZE * 0.0274958766106, CHAMFER7_SIZE * 0.999621916911), (0, 0), align=None)
    extrude(amount=127.0002, mode=Mode.SUBTRACT)
    with BuildSketch(Plane(origin=(-74.861766162, 0, -30.106093834), x_dir=(0.9996219169112968, -0.027495876610586483, 0), z_dir=(0, 0, 1)), Plane(origin=(60.738233838, 0, 23.894106166), x_dir=(-0.9996219169112968, -0.027495876610586584, 0), z_dir=(0, 0, -1))) as chamfer7_piece_2:
        Polygon((CHAMFER7_SIZE * 0.999621916911, CHAMFER7_SIZE * 0.0274958766106), (-CHAMFER7_SIZE * 0.0274958766106, CHAMFER7_SIZE * 0.999621916911), (0, 0), align=None)
    extrude(amount=54.0002, mode=Mode.SUBTRACT)
    with BuildSketch(Plane(origin=(56.438333838, 0, 23.894106166), x_dir=(0, 0, 1), z_dir=(-1, 0, 0))) as chamfer7_piece_3:
        Polygon((4.2999 - CHAMFER7_SIZE, 0), (4.2999, CHAMFER7_SIZE), (4.2999, 0), align=None)
    revolve(axis=Axis((56.438333838, 0, 23.894106166), (0, 1, 0)), revolution_arc=90, mode=Mode.SUBTRACT)
    with BuildSketch(Plane(origin=(-70.561866162, 0, 23.894106166), x_dir=(0, 0, 1), z_dir=(1, 0, 0))) as chamfer7_piece_4:
        Polygon((4.2999 - CHAMFER7_SIZE, 0), (4.2999, -CHAMFER7_SIZE), (4.2999, 0), align=None)
    revolve(axis=Axis((-70.561866162, 0, 23.894106166), (0, -1, 0)), revolution_arc=90, mode=Mode.SUBTRACT)
    with BuildSketch(Plane(origin=(-70.561866162, 0, -30.106093834), x_dir=(0, 0, -1), z_dir=(1, 0, 0))) as chamfer7_piece_5:
        Polygon((4.2999 - CHAMFER7_SIZE, 0), (4.2999, CHAMFER7_SIZE), (4.2999, 0), align=None)
    revolve(axis=Axis((-70.561866162, 0, -30.106093834), (0, 1, 0)), revolution_arc=90, mode=Mode.SUBTRACT)
    with BuildSketch(Plane(origin=(56.438333838, 0, -30.106093834), x_dir=(1, 0, 0), z_dir=(0, 0, 1))) as chamfer7_piece_6:
        Polygon((4.2999 - CHAMFER7_SIZE, 0), (4.2999, CHAMFER7_SIZE), (4.2999, 0), align=None)
    revolve(axis=Axis((56.438333838, 0, -30.106093834), (0, 1, 0)), revolution_arc=90, mode=Mode.SUBTRACT)

    # Chamfer8
    chamfer8_edges = [part.edges().sort_by_distance(p)[0] for p in [
        (-74.861766162, 2, -2.982922372),
    ]]
    chamfer(chamfer8_edges, length=CHAMFER8_SIZE - 0.0001)  # a hair under: the kernel refuses the full size


solid = part.part
